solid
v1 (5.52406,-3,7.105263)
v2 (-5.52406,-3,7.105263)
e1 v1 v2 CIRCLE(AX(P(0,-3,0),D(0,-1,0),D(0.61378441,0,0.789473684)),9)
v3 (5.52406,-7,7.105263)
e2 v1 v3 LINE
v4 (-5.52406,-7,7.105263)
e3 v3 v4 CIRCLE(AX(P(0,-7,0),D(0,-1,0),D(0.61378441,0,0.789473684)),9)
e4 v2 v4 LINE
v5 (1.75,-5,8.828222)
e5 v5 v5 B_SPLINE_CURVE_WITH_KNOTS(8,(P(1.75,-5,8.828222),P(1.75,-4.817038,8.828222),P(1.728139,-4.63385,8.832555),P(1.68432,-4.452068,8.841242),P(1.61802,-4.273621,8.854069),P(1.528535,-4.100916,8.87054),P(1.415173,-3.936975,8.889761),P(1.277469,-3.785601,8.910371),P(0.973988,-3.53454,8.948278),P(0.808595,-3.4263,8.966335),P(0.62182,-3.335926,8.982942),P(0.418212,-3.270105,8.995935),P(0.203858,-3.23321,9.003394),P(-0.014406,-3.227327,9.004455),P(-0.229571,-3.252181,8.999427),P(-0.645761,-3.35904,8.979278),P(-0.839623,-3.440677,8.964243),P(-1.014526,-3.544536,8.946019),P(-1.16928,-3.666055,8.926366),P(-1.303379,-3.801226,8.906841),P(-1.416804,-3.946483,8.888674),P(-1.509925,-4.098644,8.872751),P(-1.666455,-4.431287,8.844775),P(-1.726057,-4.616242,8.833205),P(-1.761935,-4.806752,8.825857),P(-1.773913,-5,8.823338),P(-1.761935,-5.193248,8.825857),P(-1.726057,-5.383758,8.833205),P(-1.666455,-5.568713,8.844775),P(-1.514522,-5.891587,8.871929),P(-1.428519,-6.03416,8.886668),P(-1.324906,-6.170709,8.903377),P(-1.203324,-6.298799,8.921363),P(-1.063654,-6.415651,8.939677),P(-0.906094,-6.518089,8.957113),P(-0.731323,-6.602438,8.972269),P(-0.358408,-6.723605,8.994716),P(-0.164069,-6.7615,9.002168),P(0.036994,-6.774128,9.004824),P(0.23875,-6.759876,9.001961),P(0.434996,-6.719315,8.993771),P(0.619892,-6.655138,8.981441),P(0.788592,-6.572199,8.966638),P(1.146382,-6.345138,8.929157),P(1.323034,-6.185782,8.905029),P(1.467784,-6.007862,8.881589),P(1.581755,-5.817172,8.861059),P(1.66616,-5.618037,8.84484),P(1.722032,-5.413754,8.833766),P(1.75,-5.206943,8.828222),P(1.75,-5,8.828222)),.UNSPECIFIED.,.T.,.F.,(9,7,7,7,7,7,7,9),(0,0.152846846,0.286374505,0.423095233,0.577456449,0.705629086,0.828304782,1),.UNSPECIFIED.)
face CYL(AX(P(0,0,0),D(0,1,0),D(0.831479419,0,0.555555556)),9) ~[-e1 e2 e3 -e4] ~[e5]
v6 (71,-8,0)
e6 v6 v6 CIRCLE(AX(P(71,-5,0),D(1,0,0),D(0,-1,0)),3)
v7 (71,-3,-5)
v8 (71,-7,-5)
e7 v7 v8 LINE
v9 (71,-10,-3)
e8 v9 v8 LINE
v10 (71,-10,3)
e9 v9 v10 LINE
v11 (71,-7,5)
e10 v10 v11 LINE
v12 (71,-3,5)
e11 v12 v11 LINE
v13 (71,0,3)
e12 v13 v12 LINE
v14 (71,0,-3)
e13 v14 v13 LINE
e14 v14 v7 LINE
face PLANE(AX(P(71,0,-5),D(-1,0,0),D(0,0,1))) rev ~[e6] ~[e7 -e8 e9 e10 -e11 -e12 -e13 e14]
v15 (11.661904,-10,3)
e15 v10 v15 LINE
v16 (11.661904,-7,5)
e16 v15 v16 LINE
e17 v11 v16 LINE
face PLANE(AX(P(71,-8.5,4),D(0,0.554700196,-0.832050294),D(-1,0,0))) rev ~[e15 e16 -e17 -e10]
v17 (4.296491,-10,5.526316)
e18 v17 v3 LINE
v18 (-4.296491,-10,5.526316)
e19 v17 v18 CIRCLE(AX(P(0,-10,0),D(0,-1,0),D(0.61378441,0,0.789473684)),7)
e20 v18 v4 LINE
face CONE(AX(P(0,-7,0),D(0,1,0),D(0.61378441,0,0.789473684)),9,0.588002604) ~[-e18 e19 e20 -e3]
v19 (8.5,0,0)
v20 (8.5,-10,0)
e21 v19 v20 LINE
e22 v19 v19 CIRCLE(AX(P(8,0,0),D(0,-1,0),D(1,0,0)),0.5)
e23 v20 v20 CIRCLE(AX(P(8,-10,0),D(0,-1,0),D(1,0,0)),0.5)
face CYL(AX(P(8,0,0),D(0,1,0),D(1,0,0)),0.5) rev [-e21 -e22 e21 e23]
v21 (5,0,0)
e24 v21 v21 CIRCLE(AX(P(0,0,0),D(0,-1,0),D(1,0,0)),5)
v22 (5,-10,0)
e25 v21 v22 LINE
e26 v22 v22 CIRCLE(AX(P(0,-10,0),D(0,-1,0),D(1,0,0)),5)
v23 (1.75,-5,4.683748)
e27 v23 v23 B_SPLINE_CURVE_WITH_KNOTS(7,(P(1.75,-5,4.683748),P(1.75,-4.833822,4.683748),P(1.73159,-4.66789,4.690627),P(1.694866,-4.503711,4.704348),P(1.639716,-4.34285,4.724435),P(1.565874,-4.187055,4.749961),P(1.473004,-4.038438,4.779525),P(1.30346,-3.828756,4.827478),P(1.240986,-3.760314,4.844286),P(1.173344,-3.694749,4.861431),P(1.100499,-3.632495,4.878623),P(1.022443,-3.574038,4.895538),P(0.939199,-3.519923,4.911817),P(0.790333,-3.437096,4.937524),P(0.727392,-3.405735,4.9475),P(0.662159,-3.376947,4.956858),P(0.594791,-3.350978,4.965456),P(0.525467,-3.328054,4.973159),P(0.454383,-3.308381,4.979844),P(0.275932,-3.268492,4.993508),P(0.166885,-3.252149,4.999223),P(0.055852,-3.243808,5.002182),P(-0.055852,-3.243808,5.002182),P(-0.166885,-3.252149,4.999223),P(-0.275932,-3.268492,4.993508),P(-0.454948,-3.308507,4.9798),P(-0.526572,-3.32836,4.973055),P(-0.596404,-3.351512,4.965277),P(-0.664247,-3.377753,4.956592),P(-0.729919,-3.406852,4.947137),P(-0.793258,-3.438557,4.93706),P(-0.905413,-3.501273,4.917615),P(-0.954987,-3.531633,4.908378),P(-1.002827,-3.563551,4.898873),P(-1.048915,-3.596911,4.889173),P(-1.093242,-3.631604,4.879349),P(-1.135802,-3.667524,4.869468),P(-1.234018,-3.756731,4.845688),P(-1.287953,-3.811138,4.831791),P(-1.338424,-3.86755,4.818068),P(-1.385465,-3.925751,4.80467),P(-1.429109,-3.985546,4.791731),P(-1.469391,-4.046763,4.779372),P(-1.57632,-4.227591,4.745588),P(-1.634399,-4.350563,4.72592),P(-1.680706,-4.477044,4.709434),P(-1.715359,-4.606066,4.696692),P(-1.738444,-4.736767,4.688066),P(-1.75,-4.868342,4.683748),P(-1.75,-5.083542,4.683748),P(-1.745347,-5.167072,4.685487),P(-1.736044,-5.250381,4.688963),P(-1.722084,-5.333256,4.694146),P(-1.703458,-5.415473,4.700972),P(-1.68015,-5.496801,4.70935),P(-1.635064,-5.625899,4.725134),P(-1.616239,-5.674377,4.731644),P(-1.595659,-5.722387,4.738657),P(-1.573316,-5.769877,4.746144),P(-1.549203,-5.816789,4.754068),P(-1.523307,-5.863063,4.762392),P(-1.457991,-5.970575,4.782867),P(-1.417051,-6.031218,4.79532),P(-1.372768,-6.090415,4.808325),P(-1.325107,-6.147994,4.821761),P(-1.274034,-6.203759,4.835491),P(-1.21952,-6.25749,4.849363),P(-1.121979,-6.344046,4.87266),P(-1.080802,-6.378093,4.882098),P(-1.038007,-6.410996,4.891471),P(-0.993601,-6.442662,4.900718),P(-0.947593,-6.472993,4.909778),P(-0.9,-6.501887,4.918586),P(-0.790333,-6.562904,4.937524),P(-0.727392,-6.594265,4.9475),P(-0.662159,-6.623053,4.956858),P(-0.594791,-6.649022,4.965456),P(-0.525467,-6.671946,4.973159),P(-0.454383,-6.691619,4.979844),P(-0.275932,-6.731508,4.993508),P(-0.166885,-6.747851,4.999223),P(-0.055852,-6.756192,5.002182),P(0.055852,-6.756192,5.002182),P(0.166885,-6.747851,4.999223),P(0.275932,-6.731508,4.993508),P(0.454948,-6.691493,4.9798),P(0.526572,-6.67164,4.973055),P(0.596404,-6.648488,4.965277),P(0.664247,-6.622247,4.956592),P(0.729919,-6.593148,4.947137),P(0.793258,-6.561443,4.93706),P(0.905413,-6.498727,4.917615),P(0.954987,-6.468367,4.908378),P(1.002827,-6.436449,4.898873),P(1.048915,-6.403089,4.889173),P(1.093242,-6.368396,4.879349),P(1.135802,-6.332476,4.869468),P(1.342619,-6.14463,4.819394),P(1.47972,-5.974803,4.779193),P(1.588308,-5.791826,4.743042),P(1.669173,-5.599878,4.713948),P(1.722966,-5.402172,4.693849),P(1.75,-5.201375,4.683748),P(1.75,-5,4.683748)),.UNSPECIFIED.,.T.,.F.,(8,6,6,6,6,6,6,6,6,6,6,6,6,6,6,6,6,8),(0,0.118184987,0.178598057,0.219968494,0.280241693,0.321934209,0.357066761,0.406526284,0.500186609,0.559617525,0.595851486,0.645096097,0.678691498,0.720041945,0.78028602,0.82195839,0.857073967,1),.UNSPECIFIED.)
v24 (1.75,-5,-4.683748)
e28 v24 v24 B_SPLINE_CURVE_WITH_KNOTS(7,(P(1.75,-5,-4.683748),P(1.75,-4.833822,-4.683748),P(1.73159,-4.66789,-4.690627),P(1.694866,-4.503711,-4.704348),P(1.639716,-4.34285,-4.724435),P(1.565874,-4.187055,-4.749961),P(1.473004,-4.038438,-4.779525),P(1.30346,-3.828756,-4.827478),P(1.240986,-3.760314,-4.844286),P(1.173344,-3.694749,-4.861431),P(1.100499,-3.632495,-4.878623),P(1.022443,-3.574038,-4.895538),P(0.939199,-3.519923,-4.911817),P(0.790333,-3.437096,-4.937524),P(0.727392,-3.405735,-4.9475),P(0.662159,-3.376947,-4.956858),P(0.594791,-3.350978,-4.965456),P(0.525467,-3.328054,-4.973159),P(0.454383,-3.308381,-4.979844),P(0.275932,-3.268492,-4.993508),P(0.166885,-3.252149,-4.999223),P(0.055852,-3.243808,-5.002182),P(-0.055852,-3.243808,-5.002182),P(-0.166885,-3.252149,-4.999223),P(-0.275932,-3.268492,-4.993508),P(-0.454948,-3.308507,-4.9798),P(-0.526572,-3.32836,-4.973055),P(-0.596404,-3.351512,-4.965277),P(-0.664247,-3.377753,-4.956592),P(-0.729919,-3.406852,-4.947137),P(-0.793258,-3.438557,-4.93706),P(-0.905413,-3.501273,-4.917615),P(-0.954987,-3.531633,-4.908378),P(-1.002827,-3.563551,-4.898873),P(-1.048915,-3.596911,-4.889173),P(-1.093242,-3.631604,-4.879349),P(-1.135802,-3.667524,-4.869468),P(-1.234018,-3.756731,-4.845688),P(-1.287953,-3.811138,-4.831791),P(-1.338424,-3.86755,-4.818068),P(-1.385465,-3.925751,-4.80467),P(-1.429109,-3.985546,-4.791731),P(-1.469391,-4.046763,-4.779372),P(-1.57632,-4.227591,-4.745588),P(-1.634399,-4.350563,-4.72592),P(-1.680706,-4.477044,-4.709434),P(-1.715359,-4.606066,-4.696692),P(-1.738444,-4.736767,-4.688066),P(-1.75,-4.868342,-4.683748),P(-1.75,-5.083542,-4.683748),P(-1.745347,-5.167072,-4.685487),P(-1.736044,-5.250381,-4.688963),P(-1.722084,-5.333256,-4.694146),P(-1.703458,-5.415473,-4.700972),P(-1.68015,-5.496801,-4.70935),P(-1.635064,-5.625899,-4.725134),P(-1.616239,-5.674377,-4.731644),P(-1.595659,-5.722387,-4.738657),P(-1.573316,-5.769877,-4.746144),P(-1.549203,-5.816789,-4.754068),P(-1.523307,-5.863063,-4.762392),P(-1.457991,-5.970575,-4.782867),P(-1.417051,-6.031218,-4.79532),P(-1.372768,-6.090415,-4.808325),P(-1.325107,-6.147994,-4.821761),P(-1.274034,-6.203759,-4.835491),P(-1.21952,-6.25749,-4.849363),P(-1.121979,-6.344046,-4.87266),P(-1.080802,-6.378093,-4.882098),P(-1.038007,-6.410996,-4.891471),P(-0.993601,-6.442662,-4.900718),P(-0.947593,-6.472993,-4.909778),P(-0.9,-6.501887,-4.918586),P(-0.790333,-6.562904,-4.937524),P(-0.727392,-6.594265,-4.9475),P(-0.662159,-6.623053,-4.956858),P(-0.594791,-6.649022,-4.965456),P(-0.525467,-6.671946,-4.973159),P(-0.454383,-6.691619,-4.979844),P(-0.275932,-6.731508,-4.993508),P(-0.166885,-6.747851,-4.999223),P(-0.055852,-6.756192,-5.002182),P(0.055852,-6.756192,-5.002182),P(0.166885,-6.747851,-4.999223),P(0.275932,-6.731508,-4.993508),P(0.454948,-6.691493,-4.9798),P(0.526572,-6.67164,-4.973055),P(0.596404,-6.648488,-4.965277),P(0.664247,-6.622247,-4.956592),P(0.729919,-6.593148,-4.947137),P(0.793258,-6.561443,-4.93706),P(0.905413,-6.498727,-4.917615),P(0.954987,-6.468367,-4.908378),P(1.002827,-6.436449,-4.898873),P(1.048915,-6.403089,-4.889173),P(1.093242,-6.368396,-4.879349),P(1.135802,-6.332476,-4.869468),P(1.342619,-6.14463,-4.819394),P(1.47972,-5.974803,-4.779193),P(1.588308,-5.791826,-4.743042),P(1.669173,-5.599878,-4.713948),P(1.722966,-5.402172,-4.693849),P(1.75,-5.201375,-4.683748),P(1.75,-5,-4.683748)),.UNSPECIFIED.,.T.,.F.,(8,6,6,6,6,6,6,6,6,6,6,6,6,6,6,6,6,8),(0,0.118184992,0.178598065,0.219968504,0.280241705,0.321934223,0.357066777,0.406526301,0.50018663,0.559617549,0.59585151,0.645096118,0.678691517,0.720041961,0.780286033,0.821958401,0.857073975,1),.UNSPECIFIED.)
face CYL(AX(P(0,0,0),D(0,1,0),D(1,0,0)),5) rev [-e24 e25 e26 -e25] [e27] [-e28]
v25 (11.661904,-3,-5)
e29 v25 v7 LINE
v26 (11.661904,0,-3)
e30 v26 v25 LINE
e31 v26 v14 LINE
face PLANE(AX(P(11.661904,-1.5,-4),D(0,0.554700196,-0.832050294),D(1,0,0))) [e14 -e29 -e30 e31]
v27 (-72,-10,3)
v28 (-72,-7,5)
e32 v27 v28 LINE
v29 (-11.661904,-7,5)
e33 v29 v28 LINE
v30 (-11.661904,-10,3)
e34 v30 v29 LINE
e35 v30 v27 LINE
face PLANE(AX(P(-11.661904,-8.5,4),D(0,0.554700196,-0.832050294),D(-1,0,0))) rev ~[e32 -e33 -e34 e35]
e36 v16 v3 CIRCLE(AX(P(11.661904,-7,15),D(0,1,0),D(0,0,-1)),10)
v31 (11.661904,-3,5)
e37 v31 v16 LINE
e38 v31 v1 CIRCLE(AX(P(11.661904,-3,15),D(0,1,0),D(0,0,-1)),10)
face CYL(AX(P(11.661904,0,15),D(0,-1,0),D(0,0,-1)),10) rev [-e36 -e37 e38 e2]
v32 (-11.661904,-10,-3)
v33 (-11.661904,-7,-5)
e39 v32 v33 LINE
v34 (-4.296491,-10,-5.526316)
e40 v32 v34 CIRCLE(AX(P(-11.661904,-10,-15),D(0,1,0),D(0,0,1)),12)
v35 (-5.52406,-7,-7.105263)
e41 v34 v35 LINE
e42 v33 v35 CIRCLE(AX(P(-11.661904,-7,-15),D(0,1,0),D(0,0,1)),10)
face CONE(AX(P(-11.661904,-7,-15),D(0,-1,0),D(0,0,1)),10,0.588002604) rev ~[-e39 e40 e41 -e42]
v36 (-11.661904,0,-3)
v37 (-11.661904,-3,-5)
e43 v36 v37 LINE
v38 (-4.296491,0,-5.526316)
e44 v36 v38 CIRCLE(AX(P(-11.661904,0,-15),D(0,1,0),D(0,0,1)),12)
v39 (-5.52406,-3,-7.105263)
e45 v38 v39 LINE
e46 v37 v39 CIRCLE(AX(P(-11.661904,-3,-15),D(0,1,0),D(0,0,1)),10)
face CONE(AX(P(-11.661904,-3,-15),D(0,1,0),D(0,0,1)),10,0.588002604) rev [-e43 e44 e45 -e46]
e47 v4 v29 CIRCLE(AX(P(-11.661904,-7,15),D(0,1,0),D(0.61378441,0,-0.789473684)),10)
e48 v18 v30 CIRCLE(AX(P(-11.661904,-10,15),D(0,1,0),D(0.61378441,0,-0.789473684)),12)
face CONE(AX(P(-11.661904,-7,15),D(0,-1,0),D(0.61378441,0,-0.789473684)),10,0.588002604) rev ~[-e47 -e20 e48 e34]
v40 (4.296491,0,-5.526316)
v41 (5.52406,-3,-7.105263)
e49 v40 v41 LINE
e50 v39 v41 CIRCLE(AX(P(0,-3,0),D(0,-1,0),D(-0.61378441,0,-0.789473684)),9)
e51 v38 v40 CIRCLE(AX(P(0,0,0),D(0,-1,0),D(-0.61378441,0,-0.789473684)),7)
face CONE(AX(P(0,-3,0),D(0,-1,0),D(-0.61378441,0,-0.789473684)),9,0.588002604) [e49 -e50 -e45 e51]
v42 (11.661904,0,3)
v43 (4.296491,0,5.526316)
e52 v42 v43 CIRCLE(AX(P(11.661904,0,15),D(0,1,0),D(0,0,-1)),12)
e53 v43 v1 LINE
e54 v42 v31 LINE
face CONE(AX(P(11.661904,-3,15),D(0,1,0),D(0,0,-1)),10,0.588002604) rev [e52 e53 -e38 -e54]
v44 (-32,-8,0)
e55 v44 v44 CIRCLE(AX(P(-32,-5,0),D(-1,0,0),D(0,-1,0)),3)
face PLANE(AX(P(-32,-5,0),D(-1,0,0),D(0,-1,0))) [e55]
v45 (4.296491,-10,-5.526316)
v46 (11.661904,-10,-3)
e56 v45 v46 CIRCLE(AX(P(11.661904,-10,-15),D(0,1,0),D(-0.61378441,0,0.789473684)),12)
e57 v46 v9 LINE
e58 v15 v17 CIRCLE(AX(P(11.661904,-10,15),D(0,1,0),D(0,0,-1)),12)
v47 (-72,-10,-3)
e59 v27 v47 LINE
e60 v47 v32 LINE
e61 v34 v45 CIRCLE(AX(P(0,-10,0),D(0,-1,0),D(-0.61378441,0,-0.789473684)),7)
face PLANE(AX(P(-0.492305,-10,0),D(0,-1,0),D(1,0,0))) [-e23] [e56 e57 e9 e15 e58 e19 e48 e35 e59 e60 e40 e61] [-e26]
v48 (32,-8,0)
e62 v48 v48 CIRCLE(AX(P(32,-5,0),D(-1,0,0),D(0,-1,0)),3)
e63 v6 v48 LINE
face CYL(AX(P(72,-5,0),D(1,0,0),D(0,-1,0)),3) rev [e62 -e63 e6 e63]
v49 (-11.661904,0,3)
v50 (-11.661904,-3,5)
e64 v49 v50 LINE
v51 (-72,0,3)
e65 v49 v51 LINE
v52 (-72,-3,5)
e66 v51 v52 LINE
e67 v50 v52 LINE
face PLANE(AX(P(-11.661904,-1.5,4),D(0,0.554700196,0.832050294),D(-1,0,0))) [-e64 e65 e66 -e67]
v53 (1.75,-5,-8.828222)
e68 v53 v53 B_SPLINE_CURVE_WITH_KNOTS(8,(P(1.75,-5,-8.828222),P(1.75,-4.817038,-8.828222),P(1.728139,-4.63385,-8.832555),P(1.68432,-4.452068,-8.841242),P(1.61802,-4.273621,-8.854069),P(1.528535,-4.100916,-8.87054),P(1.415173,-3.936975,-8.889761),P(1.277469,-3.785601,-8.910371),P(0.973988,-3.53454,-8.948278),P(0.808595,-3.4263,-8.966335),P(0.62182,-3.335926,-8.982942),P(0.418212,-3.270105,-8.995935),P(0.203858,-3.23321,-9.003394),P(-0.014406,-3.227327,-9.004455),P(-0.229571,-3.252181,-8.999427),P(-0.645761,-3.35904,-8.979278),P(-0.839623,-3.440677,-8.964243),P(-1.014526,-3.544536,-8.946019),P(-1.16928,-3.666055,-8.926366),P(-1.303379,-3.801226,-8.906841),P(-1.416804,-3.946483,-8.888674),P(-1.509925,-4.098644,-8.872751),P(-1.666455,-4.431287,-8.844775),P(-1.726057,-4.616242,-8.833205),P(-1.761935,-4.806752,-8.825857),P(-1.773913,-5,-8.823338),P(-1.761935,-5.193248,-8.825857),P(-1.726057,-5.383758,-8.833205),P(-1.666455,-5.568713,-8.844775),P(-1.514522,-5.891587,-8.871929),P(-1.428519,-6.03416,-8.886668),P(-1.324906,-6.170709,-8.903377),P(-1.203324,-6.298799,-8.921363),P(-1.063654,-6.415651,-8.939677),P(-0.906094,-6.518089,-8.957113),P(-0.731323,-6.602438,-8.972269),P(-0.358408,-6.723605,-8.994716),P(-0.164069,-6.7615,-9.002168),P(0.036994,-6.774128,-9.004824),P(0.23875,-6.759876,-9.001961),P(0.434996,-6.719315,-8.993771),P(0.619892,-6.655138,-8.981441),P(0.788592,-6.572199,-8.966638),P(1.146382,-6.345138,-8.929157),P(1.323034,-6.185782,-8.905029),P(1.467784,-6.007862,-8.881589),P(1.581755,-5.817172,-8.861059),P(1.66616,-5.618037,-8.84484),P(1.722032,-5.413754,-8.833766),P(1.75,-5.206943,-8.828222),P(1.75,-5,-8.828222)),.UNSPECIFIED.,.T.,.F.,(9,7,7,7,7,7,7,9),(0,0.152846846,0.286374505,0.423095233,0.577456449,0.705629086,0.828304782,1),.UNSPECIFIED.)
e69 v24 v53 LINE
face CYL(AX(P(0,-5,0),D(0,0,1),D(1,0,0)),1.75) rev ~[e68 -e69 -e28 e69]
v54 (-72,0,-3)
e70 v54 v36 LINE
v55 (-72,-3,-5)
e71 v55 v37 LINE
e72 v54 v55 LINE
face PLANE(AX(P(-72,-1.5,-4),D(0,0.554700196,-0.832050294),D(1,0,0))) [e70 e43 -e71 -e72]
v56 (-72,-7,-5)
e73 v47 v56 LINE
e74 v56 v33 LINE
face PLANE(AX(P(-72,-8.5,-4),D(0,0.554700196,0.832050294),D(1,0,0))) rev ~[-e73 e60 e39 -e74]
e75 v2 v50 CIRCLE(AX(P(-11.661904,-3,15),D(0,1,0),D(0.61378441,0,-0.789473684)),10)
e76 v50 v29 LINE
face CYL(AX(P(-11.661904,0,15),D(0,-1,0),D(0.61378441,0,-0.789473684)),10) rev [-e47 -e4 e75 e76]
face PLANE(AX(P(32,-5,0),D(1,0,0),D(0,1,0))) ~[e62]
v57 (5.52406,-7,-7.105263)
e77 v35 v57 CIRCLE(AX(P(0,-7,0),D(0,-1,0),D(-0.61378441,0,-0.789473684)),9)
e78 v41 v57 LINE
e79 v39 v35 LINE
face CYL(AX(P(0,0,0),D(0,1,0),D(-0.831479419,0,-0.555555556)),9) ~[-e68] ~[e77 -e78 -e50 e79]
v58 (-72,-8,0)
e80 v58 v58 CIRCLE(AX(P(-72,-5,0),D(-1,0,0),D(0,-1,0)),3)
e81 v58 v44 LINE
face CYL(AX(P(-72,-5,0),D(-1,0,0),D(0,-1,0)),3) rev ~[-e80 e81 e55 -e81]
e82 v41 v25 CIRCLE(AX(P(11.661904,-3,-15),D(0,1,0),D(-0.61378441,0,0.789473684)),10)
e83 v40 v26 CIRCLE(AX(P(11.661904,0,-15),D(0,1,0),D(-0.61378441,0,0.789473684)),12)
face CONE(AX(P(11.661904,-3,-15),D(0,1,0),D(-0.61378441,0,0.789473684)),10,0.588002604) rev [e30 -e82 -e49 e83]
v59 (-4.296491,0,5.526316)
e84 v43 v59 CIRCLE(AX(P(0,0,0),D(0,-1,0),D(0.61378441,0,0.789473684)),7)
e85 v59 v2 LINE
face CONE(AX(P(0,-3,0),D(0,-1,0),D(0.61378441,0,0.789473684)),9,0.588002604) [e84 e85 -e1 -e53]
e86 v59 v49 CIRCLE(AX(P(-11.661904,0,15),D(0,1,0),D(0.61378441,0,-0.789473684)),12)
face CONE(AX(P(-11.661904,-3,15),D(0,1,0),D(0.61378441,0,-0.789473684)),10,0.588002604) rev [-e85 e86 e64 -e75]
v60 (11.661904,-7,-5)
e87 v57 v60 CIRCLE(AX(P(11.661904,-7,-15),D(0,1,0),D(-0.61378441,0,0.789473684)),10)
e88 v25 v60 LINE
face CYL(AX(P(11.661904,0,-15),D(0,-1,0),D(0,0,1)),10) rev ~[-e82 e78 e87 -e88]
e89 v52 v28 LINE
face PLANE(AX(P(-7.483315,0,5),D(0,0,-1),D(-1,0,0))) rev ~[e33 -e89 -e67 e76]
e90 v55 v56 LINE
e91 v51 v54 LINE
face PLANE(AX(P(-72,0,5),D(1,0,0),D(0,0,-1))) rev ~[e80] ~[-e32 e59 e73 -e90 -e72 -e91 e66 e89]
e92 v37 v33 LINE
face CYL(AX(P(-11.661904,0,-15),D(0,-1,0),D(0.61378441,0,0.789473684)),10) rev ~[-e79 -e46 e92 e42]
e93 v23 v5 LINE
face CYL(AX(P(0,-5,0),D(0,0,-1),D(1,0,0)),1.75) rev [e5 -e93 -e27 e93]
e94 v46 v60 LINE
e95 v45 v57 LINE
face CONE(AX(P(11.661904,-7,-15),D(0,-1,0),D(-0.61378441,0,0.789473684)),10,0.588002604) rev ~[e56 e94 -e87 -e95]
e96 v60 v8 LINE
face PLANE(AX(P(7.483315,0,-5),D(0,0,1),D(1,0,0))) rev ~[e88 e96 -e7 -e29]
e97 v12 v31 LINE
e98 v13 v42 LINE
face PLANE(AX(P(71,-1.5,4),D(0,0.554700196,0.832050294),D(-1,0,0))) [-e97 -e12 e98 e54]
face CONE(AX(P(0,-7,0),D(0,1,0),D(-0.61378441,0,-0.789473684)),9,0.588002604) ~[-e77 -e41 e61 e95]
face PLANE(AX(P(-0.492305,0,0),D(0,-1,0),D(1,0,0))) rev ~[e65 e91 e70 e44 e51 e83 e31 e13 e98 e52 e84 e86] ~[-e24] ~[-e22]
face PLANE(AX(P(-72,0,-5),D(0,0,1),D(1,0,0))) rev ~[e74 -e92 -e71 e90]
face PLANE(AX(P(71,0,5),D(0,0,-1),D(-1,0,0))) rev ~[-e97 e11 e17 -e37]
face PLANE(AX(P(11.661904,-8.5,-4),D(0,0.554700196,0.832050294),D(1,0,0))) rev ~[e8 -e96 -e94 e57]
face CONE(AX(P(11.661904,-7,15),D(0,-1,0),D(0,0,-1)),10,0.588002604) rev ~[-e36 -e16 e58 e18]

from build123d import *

# Parameters (mm, degrees)
F0_R          = 5
F0_R_2        = 0.5
F1_DEPTH      = 10
F2_R          = 3
F3_DEPTH      = 40
F4_R          = 1.75
F5_DEPTH      = 9.001
F5_DEPTH_BACK = 9.001
F6_R          = 10
F7_SIZE2      = 3
F7_SIZE       = 2
F7_2_SIZE2    = 3
F7_2_SIZE     = 2


# Not quite as in the source:
# - a pattern or mirror of a feature is missing from the dataset's text; its kind, count and spacing are read off the source's solid


with BuildPart() as f1:
    # F0 (on Front) → F1 (new body)
    with BuildSketch(Plane.XZ):
        with BuildLine():
            Line((71, 5), (7.4833147735, 5))
            ThreePointArc((7.4833147735, 5), (0, 9), (-7.4833147735, 5))
            Line((-7.4833147735, 5), (-72, 5))
            Line((-72, 5), (-72, -5))
            Line((-72, -5), (-7.4833147735, -5))
            ThreePointArc((-7.4833147735, -5), (0, -9), (7.4833147735, -5))
            Line((7.4833147735, -5), (71, -5))
            Line((71, -5), (71, 5))
        make_face()
        Circle(F0_R, mode=Mode.SUBTRACT)
        with Locations((8, 0)):
            Circle(F0_R_2, mode=Mode.SUBTRACT)
    extrude(amount=F1_DEPTH)

    # F2 (on face) → F3 (cut)
    with BuildSketch(Plane(origin=(-72, 0, 0), x_dir=(0, -1, 0), z_dir=(-1, 0, 0))):
        with Locations((5, 0)):
            Circle(F2_R)
    f3 = extrude(amount=-F3_DEPTH, mode=Mode.SUBTRACT)

    # F3_copies: F3 across plane
    add(f3.mirror(Plane(origin=(0, 0, 0), x_dir=(0, 0, 1), z_dir=(1, 0, 0))), mode=Mode.SUBTRACT)

    # F4 (on Top) → F5 (cut, two sides)
    with BuildSketch(Plane.XY) as f5_sk:
        with Locations((0, -5)):
            Circle(F4_R)
    extrude(amount=-F5_DEPTH, mode=Mode.SUBTRACT)
    extrude(f5_sk.sketch, amount=F5_DEPTH_BACK, mode=Mode.SUBTRACT)

    # F6
    f6_edges = [f1.edges().sort_by_distance(p)[0] for p in [
        (-7.483315, -5, 5),
        (7.483315, -5, 5),
        (7.483315, -5, -5),
        (-7.483315, -5, -5),
    ]]
    fillet(f6_edges, radius=F6_R)

    # F7
    f7_edges = [f1.edges().sort_by_distance(p)[0] for p in [
        (-41.830952, -10, 5),
        (-41.830952, -10, -5),
    ]]
    f7_side = f1.faces().sort_by_distance((41.330952, -10, -3.558716))[0]
    chamfer(f7_edges, length=F7_SIZE, length2=F7_SIZE2, reference=f7_side)

    # F7#2
    f7_2_edges = [f1.edges().sort_by_distance(p)[0] for p in [
        (-41.830952, 0, 5),
        (-41.830952, 0, -5),
    ]]
    f7_2_side = f1.faces().sort_by_distance((41.330952, 0, -3.558716))[0]
    chamfer(f7_2_edges, length=F7_2_SIZE, length2=F7_2_SIZE2, reference=f7_2_side)


solid = f1.part
